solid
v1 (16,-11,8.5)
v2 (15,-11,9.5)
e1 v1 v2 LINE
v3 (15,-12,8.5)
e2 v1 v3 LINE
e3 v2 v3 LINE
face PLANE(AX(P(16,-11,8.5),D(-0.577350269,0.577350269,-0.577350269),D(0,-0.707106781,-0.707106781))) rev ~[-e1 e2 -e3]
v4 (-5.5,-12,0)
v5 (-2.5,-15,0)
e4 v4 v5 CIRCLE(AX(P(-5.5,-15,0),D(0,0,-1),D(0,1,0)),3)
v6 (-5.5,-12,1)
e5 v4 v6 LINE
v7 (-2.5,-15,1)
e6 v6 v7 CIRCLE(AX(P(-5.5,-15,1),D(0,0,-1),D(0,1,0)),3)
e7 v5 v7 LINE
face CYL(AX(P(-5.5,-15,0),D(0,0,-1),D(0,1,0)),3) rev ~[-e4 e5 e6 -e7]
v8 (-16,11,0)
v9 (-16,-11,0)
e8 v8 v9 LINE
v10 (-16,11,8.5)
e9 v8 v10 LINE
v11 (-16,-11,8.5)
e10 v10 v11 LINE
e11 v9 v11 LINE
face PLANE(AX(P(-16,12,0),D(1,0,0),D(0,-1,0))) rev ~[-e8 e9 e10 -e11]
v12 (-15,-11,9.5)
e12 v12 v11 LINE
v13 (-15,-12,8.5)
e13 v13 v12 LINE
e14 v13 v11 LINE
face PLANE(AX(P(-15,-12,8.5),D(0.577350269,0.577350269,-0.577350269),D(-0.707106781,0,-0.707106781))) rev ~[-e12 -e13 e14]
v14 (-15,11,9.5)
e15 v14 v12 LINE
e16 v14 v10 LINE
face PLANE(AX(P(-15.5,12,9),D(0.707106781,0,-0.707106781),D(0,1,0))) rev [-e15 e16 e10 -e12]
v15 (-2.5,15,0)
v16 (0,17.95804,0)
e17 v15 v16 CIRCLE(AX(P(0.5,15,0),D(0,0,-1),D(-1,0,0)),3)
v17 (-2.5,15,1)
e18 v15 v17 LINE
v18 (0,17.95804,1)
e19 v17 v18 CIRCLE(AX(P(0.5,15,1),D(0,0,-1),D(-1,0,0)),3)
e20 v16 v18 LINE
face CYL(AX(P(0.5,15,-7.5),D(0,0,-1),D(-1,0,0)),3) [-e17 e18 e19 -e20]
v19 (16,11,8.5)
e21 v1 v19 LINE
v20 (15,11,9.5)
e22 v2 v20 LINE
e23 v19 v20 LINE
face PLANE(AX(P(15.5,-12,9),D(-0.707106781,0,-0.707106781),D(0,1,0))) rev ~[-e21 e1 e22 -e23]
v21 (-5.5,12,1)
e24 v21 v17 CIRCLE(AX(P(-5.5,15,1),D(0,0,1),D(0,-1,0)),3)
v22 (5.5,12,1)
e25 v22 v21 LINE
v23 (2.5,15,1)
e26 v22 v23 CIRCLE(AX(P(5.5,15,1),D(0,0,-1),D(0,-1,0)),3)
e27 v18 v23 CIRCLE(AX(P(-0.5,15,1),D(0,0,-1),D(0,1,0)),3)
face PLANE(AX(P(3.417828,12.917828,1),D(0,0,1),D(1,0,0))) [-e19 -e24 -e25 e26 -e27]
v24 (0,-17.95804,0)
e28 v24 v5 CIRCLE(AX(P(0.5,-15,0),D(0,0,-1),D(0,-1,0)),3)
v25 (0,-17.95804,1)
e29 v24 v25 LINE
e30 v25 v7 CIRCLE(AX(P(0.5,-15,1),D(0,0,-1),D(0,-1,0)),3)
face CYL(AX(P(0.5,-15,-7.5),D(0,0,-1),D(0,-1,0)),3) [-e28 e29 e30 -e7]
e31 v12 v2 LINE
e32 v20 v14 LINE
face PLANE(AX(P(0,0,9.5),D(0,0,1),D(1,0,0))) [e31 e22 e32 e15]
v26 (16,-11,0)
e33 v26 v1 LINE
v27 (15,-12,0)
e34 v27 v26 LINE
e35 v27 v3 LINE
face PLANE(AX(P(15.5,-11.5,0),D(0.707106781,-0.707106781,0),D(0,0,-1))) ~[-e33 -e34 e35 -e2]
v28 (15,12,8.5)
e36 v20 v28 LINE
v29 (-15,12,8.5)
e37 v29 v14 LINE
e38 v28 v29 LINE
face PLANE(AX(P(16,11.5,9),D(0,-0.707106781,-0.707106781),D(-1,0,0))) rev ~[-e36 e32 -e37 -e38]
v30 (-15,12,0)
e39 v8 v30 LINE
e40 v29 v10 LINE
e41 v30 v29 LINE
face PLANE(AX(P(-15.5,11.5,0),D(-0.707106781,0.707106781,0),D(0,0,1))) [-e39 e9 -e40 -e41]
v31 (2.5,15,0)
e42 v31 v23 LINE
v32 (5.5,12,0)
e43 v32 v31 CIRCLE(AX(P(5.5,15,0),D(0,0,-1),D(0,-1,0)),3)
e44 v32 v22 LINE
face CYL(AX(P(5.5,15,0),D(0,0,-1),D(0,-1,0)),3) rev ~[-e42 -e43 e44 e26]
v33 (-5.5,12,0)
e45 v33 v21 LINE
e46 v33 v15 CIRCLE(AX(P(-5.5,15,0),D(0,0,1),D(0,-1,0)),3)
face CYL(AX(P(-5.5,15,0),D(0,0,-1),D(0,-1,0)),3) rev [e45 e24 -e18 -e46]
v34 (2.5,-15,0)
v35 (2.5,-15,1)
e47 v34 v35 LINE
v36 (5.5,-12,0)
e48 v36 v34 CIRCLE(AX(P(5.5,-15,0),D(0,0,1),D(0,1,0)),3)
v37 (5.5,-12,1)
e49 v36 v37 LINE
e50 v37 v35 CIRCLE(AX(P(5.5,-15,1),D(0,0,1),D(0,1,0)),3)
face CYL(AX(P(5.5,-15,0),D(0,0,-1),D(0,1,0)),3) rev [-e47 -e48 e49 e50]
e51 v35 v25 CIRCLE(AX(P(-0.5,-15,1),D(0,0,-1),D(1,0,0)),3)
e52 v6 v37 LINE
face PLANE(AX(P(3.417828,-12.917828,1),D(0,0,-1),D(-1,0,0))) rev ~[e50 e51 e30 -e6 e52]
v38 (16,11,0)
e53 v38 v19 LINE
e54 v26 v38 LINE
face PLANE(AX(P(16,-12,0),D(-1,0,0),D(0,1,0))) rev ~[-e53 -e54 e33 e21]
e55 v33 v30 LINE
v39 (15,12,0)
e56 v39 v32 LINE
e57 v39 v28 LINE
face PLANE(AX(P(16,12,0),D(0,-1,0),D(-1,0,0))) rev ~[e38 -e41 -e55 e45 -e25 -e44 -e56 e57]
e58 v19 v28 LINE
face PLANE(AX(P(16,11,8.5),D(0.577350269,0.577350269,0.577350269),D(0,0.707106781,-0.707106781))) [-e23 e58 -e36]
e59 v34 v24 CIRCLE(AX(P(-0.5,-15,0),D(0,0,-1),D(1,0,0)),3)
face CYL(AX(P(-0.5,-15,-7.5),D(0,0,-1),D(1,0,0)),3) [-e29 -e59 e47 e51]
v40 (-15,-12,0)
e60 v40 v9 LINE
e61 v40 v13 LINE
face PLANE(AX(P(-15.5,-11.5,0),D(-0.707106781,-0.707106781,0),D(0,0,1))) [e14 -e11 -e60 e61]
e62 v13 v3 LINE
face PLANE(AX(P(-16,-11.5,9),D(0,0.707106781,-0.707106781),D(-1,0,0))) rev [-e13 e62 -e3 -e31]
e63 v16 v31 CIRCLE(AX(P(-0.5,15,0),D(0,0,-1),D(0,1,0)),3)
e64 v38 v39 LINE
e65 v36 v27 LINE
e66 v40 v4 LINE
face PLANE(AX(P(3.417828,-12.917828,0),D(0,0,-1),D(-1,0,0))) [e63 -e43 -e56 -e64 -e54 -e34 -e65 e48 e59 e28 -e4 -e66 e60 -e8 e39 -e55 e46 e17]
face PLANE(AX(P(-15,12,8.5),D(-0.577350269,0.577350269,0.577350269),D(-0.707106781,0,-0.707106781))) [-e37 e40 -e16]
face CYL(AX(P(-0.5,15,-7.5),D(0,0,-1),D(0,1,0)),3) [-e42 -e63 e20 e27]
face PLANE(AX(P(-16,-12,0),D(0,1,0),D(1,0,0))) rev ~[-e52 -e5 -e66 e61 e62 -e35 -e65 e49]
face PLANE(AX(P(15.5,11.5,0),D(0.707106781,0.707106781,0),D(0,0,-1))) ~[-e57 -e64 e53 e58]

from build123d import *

# Parameters (mm, degrees)
F0_W        = 5
F0_H        = 6
F1_DEPTH    = 9.5
F2_DEPTH    = 1
F3_T1_DEPTH = 1
F3_T3_DEPTH = 16
F4_SIZE     = 1


# Not quite as in the source:
# - a fillet or chamfer that OpenCascade refuses, or shapes differently, is made with other operations: its cross-section is extruded or revolved along the edge and cut away or added


with BuildPart() as f1:
    # F0 (on Top) → F1 (new body)
    with BuildSketch(Plane.XY):
        Polygon((16, -12), (16, 12), (2.5, 12), (2.5, 6), (-2.5, 6), (-2.5, 12), (-16, 12), (-16, -12), (-2.5, -12), (-2.5, -6), (2.5, -6), (2.5, -12), align=None)
        with Locations((0, -9)):
            Rectangle(F0_W, F0_H)
        with Locations((0, 9)):
            Rectangle(F0_W, F0_H)
    extrude(amount=F1_DEPTH)

    # F0 (on Top) → F2 (join)
    with BuildSketch(Plane.XY):
        with Locations((0, 15)):
            Rectangle(F0_W, F0_H)
        with Locations((0, -15)):
            Rectangle(F0_W, F0_H)
    extrude(amount=F2_DEPTH)

    # F3: fillet of radius 3 on 8 edges, made by hand

    # F3_s2 → F3_t1 (join)
    with BuildSketch(Plane.XY):
        with BuildLine():
            ThreePointArc((5.5, -12), (3.3786796564, -12.8786796564), (2.5, -15))
            Line((2.5, -15), (2.5, -12))
            Line((2.5, -12), (5.5, -12))
        make_face()
        with BuildLine():
            ThreePointArc((-5.5, -12), (-3.3786796564, -12.8786796564), (-2.5, -15))
            Line((-2.5, -15), (-2.5, -12))
            Line((-2.5, -12), (-5.5, -12))
        make_face()
        with BuildLine():
            ThreePointArc((-5.5, 12), (-3.3786796564, 12.8786796564), (-2.5, 15))
            Line((-2.5, 15), (-2.5, 12))
            Line((-2.5, 12), (-5.5, 12))
        make_face()
        with BuildLine():
            ThreePointArc((5.5, 12), (3.3786796564, 12.8786796564), (2.5, 15))
            Line((2.5, 15), (2.5, 12))
            Line((2.5, 12), (5.5, 12))
        make_face()
    extrude(amount=F3_T1_DEPTH)

    # F3_s4 → F3_t3 (cut)
    with BuildSketch(Plane.XY.offset(-7.5)):
        with BuildLine():
            ThreePointArc((0.5, -18), (-1.6213203436, -17.1213203436), (-2.5, -15))
            Line((-2.5, -15), (-2.5, -18))
            Line((-2.5, -18), (0.5, -18))
        make_face()
        with BuildLine():
            ThreePointArc((2.5, -15), (1.6213203436, -17.1213203436), (-0.5, -18))
            Line((-0.5, -18), (2.5, -18))
            Line((2.5, -18), (2.5, -15))
        make_face()
        with BuildLine():
            ThreePointArc((-2.5, 15), (-1.6213203436, 17.1213203436), (0.5, 18))
            Line((0.5, 18), (-2.5, 18))
            Line((-2.5, 18), (-2.5, 15))
        make_face()
        with BuildLine():
            ThreePointArc((-0.5, 18), (1.6213203436, 17.1213203436), (2.5, 15))
            Line((2.5, 15), (2.5, 18))
            Line((2.5, 18), (-0.5, 18))
        make_face()
    extrude(amount=F3_T3_DEPTH, mode=Mode.SUBTRACT)

    # F4
    f4_edges = [f1.edges().sort_by_distance(p)[0] for p in [
        (-16, 0, 9.5),
        (0, 12, 9.5),
        (0, -12, 9.5),
        (16, 0, 9.5),
        (-16, 12, 4.75),
        (-16, -12, 4.75),
        (16, -12, 4.75),
        (16, 12, 4.75),
    ]]
    chamfer(f4_edges, length=F4_SIZE)


solid = f1.part
